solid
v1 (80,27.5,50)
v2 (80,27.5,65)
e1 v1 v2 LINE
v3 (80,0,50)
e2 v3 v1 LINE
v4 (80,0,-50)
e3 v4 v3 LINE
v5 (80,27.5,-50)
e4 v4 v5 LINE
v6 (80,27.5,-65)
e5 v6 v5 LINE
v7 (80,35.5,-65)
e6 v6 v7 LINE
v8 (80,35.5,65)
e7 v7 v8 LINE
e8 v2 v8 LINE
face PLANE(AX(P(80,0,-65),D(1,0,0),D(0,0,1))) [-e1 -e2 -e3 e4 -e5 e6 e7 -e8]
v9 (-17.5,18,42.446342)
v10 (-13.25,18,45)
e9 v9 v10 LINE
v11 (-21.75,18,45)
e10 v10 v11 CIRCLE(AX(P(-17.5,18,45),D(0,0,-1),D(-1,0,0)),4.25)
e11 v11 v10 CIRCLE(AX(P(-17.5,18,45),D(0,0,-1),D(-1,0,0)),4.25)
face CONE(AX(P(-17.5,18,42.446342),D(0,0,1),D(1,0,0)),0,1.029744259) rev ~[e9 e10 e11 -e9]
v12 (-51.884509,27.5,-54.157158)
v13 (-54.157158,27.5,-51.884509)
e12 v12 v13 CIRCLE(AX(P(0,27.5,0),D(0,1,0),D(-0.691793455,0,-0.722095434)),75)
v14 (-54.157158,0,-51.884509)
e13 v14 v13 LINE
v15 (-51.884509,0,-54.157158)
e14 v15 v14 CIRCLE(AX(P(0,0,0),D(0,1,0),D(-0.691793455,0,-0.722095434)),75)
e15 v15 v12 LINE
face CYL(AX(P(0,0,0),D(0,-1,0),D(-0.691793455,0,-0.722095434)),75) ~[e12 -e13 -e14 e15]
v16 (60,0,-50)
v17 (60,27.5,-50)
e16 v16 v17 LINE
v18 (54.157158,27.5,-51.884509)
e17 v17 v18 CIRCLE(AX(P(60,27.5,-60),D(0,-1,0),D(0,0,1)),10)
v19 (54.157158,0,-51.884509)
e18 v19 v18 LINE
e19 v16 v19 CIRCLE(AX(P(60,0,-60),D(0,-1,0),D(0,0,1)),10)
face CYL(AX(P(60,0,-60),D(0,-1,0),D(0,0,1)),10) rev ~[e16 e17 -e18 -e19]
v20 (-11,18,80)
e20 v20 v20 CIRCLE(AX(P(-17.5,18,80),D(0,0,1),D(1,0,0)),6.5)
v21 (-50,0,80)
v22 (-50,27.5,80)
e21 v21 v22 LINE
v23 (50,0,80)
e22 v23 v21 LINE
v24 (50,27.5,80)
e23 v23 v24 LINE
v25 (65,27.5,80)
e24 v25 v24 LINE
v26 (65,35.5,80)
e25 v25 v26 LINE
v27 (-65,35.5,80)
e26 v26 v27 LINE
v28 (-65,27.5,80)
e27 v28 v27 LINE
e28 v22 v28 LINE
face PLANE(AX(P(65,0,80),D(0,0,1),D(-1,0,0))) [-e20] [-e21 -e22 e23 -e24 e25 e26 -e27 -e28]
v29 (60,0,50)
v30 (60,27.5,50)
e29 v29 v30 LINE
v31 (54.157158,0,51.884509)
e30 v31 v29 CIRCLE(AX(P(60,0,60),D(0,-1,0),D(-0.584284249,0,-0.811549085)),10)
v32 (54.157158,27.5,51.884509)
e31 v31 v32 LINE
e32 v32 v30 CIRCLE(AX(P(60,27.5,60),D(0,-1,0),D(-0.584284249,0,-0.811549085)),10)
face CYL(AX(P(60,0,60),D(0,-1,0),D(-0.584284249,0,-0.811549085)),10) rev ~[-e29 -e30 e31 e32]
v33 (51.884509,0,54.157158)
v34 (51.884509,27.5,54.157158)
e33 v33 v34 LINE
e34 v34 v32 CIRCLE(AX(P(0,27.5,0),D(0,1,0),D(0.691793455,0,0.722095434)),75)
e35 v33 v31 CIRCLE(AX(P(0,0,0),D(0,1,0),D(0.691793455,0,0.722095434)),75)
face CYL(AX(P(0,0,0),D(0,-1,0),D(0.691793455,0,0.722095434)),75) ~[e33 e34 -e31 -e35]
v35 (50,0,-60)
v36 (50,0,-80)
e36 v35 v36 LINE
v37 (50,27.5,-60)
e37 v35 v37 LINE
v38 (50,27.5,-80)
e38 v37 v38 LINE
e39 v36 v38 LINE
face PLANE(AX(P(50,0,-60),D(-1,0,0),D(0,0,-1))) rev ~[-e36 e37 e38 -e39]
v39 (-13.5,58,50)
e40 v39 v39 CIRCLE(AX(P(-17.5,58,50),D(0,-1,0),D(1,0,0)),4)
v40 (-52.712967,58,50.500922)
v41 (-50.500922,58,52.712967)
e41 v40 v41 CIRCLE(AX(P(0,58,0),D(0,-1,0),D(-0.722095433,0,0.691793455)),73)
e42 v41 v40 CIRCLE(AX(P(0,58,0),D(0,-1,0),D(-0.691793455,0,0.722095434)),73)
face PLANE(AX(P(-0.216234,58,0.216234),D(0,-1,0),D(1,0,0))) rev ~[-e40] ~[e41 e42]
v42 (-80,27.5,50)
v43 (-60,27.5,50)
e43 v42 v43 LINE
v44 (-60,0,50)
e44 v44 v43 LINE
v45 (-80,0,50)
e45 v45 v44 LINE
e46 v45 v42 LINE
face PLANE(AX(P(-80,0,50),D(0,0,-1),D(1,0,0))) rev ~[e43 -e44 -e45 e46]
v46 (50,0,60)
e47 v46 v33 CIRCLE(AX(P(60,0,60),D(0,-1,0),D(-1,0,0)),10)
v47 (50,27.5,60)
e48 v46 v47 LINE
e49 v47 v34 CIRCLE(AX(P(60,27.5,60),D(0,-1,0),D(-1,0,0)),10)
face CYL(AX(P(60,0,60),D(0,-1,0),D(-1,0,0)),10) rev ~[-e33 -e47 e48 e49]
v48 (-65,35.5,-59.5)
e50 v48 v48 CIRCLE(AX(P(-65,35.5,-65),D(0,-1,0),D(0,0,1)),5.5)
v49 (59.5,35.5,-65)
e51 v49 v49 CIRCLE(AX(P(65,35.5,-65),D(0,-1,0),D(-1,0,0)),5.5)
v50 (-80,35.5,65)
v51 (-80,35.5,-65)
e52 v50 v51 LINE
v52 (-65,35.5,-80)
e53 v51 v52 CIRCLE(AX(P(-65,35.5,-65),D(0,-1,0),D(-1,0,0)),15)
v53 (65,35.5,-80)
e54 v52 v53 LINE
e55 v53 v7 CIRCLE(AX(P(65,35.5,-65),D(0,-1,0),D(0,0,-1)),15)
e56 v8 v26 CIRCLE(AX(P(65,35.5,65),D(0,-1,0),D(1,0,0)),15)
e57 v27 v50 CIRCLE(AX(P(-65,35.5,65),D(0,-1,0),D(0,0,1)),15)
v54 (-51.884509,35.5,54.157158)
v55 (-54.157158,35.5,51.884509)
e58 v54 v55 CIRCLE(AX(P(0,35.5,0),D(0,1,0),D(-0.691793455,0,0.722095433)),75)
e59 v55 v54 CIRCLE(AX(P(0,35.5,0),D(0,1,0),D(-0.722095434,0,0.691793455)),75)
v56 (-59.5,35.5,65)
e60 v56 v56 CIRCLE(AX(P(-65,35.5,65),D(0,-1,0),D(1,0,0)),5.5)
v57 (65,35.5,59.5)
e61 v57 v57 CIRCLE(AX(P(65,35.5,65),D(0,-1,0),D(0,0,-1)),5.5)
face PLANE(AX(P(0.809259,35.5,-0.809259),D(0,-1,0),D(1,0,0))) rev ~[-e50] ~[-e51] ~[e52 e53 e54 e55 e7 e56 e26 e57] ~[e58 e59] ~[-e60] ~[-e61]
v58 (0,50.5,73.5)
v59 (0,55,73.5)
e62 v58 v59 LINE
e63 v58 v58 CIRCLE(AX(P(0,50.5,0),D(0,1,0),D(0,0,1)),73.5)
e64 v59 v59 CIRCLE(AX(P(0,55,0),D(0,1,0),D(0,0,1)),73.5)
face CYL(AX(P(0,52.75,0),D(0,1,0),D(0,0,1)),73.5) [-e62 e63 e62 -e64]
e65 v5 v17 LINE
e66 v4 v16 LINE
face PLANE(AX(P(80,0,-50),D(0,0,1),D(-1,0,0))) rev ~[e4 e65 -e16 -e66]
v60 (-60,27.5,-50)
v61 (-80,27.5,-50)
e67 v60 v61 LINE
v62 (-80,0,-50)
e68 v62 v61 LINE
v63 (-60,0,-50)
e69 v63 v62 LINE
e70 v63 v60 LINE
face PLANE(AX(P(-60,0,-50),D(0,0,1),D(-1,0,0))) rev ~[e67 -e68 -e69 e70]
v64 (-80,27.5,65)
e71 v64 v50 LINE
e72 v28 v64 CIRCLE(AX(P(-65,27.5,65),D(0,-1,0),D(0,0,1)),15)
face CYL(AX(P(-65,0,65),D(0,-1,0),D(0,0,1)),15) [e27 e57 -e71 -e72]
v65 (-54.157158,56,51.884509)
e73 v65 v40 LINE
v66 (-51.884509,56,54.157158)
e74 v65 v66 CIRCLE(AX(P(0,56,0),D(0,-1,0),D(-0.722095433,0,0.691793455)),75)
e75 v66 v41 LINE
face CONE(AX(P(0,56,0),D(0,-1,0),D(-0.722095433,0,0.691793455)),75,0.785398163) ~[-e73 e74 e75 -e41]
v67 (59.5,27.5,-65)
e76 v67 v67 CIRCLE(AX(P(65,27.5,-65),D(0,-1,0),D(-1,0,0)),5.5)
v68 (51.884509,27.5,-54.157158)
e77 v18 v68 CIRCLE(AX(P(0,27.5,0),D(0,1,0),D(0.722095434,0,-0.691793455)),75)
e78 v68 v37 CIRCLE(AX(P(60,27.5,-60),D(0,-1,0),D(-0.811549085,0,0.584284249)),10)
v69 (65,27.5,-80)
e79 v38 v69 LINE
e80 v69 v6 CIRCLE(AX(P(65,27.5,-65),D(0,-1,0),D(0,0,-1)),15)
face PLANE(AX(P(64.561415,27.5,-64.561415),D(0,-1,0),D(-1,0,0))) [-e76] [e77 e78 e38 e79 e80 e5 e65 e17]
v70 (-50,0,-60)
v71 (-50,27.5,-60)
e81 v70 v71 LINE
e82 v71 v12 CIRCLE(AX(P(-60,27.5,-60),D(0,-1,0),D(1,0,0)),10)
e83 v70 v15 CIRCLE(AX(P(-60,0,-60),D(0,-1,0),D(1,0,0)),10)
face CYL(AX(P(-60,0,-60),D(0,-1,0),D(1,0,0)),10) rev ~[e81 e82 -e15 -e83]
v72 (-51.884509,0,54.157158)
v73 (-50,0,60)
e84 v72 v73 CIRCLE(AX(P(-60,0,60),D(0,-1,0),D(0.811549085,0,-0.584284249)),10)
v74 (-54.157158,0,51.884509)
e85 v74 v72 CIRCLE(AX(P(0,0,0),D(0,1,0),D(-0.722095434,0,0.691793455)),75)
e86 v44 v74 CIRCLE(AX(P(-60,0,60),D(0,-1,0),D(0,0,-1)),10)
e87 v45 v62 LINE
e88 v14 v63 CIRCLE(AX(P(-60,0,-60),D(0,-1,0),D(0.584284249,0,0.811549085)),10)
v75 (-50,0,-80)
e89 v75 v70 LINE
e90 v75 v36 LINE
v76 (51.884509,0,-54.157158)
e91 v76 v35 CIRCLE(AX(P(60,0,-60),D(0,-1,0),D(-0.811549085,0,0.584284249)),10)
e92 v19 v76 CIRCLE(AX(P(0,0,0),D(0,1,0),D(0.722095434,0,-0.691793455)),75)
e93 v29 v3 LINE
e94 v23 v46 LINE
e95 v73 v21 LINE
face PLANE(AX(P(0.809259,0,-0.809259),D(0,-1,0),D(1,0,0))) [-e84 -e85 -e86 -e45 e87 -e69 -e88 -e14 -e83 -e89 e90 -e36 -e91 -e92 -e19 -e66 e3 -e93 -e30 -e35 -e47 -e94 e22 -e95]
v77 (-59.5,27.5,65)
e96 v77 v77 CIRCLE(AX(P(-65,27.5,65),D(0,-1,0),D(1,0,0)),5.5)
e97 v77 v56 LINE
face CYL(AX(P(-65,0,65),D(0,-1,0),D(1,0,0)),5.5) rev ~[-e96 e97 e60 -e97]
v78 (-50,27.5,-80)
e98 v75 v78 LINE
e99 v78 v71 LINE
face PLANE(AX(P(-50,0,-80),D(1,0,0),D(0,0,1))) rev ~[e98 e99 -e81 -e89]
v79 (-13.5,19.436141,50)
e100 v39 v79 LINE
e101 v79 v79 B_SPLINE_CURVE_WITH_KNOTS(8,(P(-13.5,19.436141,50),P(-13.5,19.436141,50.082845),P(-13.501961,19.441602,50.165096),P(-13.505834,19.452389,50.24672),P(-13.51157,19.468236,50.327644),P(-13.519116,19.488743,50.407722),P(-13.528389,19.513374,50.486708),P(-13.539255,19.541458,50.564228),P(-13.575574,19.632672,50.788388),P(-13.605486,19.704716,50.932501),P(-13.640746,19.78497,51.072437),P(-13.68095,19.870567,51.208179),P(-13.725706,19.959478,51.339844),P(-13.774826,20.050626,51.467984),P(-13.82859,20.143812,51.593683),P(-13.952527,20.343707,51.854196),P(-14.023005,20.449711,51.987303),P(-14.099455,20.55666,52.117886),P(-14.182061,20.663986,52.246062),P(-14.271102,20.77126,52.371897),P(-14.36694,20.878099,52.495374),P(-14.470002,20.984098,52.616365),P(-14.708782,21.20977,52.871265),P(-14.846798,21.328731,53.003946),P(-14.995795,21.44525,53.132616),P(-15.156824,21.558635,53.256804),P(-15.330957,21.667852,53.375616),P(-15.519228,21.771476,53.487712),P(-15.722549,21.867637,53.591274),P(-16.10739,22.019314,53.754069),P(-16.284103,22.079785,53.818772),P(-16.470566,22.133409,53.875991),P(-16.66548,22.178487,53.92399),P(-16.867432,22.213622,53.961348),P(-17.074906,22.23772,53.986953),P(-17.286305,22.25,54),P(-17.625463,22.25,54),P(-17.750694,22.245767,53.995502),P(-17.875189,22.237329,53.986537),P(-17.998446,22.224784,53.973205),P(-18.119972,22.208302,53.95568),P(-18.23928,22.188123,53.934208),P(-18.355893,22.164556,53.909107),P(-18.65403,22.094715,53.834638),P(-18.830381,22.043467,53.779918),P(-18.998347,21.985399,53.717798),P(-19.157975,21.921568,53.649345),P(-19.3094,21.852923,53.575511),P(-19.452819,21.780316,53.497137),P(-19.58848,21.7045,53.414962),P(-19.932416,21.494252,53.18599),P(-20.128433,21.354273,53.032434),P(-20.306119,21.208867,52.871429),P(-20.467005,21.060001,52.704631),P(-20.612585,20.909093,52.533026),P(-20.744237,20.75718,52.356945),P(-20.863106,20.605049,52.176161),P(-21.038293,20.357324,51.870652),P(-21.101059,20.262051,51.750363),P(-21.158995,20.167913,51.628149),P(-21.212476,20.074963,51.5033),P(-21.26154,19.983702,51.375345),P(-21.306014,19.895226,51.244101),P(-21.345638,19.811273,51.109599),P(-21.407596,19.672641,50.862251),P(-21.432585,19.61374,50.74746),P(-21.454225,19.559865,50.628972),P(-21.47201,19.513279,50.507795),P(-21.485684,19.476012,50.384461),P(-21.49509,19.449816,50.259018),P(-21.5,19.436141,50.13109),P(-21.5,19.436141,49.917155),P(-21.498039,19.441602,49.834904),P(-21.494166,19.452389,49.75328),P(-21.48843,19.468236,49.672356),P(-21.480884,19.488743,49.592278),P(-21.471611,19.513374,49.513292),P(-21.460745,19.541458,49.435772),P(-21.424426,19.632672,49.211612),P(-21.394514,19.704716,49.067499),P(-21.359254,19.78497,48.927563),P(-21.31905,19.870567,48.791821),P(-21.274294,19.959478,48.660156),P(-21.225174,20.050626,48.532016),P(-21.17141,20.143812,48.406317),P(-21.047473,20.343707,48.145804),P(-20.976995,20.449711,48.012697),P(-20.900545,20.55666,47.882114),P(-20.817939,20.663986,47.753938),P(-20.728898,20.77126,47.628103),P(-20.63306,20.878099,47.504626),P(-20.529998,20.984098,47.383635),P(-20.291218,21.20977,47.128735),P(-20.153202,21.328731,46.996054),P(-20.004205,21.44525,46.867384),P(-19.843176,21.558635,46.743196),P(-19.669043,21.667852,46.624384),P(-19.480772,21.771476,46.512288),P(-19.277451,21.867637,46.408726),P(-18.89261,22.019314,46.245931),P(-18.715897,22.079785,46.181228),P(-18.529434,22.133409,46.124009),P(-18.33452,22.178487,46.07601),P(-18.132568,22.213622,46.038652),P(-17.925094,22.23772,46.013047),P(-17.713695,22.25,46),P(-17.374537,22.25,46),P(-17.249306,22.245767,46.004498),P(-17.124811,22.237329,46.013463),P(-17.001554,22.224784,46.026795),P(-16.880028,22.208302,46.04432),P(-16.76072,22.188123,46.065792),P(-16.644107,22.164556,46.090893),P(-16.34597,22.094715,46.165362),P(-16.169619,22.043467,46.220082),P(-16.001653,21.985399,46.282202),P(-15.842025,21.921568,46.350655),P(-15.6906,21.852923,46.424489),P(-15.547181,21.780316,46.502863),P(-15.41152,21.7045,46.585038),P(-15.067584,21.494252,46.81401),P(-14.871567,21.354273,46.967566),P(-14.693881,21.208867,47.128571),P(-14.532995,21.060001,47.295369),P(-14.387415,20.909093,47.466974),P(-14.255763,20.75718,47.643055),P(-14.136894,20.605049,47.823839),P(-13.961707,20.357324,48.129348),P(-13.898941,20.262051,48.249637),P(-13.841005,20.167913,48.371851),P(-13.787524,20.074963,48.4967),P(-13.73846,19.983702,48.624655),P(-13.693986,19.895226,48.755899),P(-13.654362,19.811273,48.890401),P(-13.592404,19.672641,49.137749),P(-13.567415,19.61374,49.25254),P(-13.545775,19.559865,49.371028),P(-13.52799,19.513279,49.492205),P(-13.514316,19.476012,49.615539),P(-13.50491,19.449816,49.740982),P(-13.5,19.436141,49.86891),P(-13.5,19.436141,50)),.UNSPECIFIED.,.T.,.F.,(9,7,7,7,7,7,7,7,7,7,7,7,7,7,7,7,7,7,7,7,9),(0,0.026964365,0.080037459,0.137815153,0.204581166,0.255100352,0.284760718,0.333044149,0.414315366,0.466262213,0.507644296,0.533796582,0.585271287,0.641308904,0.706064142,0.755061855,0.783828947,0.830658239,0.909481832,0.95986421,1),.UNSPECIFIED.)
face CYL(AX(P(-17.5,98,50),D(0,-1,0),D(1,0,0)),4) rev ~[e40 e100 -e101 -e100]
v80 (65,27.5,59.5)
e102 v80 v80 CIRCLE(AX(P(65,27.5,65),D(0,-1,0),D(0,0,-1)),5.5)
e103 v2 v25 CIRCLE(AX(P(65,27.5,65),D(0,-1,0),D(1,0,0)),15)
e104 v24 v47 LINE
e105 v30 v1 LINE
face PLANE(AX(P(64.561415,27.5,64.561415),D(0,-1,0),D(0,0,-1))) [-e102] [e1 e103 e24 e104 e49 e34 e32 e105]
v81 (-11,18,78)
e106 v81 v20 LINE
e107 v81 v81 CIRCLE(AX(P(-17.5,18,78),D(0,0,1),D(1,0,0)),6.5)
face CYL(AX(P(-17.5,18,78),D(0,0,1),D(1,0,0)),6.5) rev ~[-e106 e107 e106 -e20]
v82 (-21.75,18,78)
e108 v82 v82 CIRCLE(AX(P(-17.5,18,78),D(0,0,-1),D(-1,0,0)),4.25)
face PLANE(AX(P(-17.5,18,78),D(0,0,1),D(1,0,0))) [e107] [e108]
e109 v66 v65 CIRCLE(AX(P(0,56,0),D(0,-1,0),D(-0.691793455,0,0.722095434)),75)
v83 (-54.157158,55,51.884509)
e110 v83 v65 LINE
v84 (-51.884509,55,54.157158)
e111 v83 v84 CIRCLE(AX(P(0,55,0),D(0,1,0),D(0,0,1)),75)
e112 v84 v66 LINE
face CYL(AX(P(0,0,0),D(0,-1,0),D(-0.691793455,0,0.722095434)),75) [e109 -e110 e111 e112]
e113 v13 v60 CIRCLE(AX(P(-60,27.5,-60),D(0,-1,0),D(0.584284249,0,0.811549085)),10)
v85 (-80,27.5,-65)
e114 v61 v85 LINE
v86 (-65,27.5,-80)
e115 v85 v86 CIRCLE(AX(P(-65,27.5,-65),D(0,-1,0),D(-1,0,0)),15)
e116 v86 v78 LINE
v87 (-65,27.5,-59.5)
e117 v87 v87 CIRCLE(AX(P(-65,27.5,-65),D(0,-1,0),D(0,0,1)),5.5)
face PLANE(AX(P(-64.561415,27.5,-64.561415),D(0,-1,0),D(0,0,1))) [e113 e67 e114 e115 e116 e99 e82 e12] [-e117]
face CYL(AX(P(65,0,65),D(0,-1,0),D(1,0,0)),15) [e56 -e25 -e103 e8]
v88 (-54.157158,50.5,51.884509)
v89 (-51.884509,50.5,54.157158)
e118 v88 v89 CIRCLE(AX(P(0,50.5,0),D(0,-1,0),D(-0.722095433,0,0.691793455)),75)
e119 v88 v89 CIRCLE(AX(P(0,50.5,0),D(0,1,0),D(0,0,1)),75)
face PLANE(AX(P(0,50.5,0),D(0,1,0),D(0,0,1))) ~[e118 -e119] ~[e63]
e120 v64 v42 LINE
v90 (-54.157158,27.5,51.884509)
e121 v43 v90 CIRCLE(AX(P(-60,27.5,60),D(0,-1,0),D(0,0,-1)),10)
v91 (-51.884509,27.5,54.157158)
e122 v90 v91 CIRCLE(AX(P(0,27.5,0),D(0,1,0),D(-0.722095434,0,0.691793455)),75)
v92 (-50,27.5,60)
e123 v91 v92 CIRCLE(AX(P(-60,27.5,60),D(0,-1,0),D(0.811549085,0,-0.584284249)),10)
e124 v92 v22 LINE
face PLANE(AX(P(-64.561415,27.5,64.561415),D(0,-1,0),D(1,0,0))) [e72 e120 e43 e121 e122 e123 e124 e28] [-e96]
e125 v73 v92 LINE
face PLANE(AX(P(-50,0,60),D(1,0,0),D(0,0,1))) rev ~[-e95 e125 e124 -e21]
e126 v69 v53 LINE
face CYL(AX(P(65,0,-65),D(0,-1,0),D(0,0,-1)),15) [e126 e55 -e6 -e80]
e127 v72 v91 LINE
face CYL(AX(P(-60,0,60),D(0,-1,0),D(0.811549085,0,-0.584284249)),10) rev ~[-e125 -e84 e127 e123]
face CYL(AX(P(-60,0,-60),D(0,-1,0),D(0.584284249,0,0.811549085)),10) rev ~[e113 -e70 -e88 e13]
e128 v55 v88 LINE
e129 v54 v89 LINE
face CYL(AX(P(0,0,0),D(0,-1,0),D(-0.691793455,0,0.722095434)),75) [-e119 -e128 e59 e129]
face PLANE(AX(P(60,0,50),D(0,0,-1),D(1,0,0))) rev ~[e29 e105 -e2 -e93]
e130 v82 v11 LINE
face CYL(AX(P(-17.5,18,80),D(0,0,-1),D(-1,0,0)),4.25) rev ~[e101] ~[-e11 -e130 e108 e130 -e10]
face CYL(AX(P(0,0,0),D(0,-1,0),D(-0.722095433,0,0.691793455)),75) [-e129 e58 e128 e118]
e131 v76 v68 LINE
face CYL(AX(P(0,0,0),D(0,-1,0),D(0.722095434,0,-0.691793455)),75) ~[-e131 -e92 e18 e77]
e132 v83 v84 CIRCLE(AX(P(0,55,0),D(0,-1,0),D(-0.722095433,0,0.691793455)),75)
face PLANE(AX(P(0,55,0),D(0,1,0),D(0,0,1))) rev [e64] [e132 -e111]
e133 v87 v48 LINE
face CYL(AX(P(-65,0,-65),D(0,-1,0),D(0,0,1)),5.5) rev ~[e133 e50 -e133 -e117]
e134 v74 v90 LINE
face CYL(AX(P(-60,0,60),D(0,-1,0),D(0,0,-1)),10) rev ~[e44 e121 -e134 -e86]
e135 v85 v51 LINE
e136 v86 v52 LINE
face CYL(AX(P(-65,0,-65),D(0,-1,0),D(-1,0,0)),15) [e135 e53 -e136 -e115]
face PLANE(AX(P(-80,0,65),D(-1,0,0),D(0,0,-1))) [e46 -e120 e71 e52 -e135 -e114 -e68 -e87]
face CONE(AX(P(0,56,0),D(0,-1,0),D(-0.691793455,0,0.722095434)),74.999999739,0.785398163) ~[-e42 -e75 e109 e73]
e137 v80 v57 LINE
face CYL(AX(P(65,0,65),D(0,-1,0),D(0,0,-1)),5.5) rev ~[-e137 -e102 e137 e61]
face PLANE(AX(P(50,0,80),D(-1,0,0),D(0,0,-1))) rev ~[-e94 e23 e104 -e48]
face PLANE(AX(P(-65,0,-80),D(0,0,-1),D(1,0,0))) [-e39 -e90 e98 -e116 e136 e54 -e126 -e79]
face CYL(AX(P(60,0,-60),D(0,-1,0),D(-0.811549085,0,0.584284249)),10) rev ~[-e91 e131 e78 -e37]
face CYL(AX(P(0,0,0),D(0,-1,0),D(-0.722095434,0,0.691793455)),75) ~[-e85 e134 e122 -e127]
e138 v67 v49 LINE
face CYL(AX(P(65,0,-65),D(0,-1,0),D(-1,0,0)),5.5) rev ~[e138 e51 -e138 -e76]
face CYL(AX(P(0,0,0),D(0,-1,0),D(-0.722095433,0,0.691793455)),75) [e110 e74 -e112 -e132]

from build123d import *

# Parameters (mm, degrees)
F1_DEPTH        = 58
F0_R            = 5.5
F2_DEPTH        = 35.5
F3_DEPTH        = 35.5
F3_COPIES_COUNT = 4
F4_DEPTH        = 27.5
F4_COPIES_COUNT = 4
F5_SIZE         = 2
F7_D            = 8.5
F7_DEPTH        = 35
F7_CBORE_D      = 13
F7_CBORE_DEPTH  = 2
F7_TIP          = 2.5536576309
F9_D            = 8
F9_DEPTH        = 40
F9_TIP          = 2.4034424761
F10_W           = 4.5
F10_H           = 1.5


# Not quite as in the source:
# - a pattern or mirror of a feature is missing from the dataset's text; its kind, count and spacing are read off the source's solid


with BuildPart() as f1:
    # F0 (on Front) → F1 (new body)
    with BuildSketch(Plane.XZ):
        with BuildLine():
            ThreePointArc((-51.8845091547, 54.1571575119), (-52.9289321881, 52.9289321881), (-54.1571575119, 51.8845091547))
            ThreePointArc((-54.1571575119, 51.8845091547), (-27.9572279259, -69.5944926463), (75, 0))
            ThreePointArc((75, 0), (29.4419922338, 68.979483133), (-51.8845091547, 54.1571575119))
        make_face()
        with BuildLine():
            ThreePointArc((-51.8845091547, 54.1571575119), (-53.033008589, 53.033008589), (-54.1571575119, 51.8845091547))
            ThreePointArc((-54.1571575119, 51.8845091547), (-52.9289321881, 52.9289321881), (-51.8845091547, 54.1571575119))
        make_face()
    extrude(amount=-F1_DEPTH)

    # F0 (on Front) → F2 (join)
    with BuildSketch(Plane.XZ):
        with BuildLine():
            Line((-65, -80), (65, -80))
            ThreePointArc((65, -80), (75.6066017178, -75.6066017178), (80, -65))
            Line((80, -65), (80, 65))
            ThreePointArc((80, 65), (75.6066017178, 75.6066017178), (65, 80))
            Line((65, 80), (-50, 80))
            Line((-50, 80), (-50, 60))
            ThreePointArc((-50, 60), (-50.4827811717, 56.9303834484), (-51.8845091547, 54.1571575119))
            ThreePointArc((-51.8845091547, 54.1571575119), (29.4419922338, 68.979483133), (75, 0))
            ThreePointArc((75, 0), (-27.9572279259, -69.5944926463), (-54.1571575119, 51.8845091547))
            ThreePointArc((-54.1571575119, 51.8845091547), (-56.9303834484, 50.4827811717), (-60, 50))
            Line((-60, 50), (-80, 50))
            Line((-80, 50), (-80, -65))
            ThreePointArc((-80, -65), (-75.6066017178, -75.6066017178), (-65, -80))
        make_face()
        with BuildLine():
            Line((-80, 65), (-80, 50))
            Line((-80, 50), (-60, 50))
            ThreePointArc((-60, 50), (-56.9303834484, 50.4827811717), (-54.1571575119, 51.8845091547))
            ThreePointArc((-54.1571575119, 51.8845091547), (-53.033008589, 53.033008589), (-51.8845091547, 54.1571575119))
            ThreePointArc((-51.8845091547, 54.1571575119), (-50.4827811717, 56.9303834484), (-50, 60))
            Line((-50, 60), (-50, 80))
            Line((-50, 80), (-65, 80))
            ThreePointArc((-65, 80), (-75.6066017178, 75.6066017178), (-80, 65))
        make_face()
        with Locations((-65, 65)):
            Circle(F0_R, mode=Mode.SUBTRACT)
        with Locations((-65, 65)):
            Circle(F0_R)
    extrude(amount=-F2_DEPTH)

    # F0 (on Front) → F3 (cut, through all)
    with BuildSketch(Plane.XZ):
        with Locations((-65, 65)):
            Circle(F0_R)
    f3 = extrude(amount=-F3_DEPTH, mode=Mode.SUBTRACT)

    # F3_copies: F3 ×4 about axis
    f3_copies_axis = Axis((0, 0, 0), (0, 1, 0))
    for i in range(1, F3_COPIES_COUNT):
        add(f3.rotate(f3_copies_axis, i * 360 / F3_COPIES_COUNT), mode=Mode.SUBTRACT)

    # F0 (on Front) → F4 (cut)
    with BuildSketch(Plane.XZ):
        with BuildLine():
            Line((-80, 65), (-80, 50))
            Line((-80, 50), (-60, 50))
            ThreePointArc((-60, 50), (-56.9303834484, 50.4827811717), (-54.1571575119, 51.8845091547))
            ThreePointArc((-54.1571575119, 51.8845091547), (-53.033008589, 53.033008589), (-51.8845091547, 54.1571575119))
            ThreePointArc((-51.8845091547, 54.1571575119), (-50.4827811717, 56.9303834484), (-50, 60))
            Line((-50, 60), (-50, 80))
            Line((-50, 80), (-65, 80))
            ThreePointArc((-65, 80), (-75.6066017178, 75.6066017178), (-80, 65))
        make_face()
        with Locations((-65, 65)):
            Circle(F0_R, mode=Mode.SUBTRACT)
    f4 = extrude(amount=-F4_DEPTH, mode=Mode.SUBTRACT)

    # F4_copies: F4 ×4 about axis
    f4_copies_axis = Axis((0, 0, 0), (0, 1, 0))
    for i in range(1, F4_COPIES_COUNT):
        add(f4.rotate(f4_copies_axis, i * 360 / F4_COPIES_COUNT), mode=Mode.SUBTRACT)

    # F5
    f5_edges = [f1.edges().sort_by_distance(p)[0] for p in [
        (-75, 58, 0),
    ]]
    chamfer(f5_edges, length=F5_SIZE)

    # F7
    with Locations(Plane.XY.offset(80)):
        with Locations((-17.5, 18)):
            CounterBoreHole(F7_D / 2, F7_CBORE_D / 2, F7_CBORE_DEPTH, depth=F7_DEPTH)
            with Locations((0, 0, -(F7_DEPTH + F7_TIP / 2))):  # 118° drill point
                Cone(0, F7_D / 2, F7_TIP, mode=Mode.SUBTRACT)

    # F9
    with Locations(Plane(origin=(0, 58, 0), x_dir=(-1, 0, 0), z_dir=(0, 1, 0))):
        with Locations((17.5, 50)):
            Hole(F9_D / 2, depth=F9_DEPTH)
            with Locations((0, 0, -(F9_DEPTH + F9_TIP / 2))):  # 118° drill point
                Cone(0, F9_D / 2, F9_TIP, mode=Mode.SUBTRACT)

    # F10 (on Right) → F11 (revolve, cut)
    with BuildSketch(Plane.YZ):
        with Locations((52.75, 74.25)):
            Rectangle(F10_W, F10_H)
    revolve(axis=Axis((0, 29, 0), (0, 1, 0)), mode=Mode.SUBTRACT)


solid = f1.part
